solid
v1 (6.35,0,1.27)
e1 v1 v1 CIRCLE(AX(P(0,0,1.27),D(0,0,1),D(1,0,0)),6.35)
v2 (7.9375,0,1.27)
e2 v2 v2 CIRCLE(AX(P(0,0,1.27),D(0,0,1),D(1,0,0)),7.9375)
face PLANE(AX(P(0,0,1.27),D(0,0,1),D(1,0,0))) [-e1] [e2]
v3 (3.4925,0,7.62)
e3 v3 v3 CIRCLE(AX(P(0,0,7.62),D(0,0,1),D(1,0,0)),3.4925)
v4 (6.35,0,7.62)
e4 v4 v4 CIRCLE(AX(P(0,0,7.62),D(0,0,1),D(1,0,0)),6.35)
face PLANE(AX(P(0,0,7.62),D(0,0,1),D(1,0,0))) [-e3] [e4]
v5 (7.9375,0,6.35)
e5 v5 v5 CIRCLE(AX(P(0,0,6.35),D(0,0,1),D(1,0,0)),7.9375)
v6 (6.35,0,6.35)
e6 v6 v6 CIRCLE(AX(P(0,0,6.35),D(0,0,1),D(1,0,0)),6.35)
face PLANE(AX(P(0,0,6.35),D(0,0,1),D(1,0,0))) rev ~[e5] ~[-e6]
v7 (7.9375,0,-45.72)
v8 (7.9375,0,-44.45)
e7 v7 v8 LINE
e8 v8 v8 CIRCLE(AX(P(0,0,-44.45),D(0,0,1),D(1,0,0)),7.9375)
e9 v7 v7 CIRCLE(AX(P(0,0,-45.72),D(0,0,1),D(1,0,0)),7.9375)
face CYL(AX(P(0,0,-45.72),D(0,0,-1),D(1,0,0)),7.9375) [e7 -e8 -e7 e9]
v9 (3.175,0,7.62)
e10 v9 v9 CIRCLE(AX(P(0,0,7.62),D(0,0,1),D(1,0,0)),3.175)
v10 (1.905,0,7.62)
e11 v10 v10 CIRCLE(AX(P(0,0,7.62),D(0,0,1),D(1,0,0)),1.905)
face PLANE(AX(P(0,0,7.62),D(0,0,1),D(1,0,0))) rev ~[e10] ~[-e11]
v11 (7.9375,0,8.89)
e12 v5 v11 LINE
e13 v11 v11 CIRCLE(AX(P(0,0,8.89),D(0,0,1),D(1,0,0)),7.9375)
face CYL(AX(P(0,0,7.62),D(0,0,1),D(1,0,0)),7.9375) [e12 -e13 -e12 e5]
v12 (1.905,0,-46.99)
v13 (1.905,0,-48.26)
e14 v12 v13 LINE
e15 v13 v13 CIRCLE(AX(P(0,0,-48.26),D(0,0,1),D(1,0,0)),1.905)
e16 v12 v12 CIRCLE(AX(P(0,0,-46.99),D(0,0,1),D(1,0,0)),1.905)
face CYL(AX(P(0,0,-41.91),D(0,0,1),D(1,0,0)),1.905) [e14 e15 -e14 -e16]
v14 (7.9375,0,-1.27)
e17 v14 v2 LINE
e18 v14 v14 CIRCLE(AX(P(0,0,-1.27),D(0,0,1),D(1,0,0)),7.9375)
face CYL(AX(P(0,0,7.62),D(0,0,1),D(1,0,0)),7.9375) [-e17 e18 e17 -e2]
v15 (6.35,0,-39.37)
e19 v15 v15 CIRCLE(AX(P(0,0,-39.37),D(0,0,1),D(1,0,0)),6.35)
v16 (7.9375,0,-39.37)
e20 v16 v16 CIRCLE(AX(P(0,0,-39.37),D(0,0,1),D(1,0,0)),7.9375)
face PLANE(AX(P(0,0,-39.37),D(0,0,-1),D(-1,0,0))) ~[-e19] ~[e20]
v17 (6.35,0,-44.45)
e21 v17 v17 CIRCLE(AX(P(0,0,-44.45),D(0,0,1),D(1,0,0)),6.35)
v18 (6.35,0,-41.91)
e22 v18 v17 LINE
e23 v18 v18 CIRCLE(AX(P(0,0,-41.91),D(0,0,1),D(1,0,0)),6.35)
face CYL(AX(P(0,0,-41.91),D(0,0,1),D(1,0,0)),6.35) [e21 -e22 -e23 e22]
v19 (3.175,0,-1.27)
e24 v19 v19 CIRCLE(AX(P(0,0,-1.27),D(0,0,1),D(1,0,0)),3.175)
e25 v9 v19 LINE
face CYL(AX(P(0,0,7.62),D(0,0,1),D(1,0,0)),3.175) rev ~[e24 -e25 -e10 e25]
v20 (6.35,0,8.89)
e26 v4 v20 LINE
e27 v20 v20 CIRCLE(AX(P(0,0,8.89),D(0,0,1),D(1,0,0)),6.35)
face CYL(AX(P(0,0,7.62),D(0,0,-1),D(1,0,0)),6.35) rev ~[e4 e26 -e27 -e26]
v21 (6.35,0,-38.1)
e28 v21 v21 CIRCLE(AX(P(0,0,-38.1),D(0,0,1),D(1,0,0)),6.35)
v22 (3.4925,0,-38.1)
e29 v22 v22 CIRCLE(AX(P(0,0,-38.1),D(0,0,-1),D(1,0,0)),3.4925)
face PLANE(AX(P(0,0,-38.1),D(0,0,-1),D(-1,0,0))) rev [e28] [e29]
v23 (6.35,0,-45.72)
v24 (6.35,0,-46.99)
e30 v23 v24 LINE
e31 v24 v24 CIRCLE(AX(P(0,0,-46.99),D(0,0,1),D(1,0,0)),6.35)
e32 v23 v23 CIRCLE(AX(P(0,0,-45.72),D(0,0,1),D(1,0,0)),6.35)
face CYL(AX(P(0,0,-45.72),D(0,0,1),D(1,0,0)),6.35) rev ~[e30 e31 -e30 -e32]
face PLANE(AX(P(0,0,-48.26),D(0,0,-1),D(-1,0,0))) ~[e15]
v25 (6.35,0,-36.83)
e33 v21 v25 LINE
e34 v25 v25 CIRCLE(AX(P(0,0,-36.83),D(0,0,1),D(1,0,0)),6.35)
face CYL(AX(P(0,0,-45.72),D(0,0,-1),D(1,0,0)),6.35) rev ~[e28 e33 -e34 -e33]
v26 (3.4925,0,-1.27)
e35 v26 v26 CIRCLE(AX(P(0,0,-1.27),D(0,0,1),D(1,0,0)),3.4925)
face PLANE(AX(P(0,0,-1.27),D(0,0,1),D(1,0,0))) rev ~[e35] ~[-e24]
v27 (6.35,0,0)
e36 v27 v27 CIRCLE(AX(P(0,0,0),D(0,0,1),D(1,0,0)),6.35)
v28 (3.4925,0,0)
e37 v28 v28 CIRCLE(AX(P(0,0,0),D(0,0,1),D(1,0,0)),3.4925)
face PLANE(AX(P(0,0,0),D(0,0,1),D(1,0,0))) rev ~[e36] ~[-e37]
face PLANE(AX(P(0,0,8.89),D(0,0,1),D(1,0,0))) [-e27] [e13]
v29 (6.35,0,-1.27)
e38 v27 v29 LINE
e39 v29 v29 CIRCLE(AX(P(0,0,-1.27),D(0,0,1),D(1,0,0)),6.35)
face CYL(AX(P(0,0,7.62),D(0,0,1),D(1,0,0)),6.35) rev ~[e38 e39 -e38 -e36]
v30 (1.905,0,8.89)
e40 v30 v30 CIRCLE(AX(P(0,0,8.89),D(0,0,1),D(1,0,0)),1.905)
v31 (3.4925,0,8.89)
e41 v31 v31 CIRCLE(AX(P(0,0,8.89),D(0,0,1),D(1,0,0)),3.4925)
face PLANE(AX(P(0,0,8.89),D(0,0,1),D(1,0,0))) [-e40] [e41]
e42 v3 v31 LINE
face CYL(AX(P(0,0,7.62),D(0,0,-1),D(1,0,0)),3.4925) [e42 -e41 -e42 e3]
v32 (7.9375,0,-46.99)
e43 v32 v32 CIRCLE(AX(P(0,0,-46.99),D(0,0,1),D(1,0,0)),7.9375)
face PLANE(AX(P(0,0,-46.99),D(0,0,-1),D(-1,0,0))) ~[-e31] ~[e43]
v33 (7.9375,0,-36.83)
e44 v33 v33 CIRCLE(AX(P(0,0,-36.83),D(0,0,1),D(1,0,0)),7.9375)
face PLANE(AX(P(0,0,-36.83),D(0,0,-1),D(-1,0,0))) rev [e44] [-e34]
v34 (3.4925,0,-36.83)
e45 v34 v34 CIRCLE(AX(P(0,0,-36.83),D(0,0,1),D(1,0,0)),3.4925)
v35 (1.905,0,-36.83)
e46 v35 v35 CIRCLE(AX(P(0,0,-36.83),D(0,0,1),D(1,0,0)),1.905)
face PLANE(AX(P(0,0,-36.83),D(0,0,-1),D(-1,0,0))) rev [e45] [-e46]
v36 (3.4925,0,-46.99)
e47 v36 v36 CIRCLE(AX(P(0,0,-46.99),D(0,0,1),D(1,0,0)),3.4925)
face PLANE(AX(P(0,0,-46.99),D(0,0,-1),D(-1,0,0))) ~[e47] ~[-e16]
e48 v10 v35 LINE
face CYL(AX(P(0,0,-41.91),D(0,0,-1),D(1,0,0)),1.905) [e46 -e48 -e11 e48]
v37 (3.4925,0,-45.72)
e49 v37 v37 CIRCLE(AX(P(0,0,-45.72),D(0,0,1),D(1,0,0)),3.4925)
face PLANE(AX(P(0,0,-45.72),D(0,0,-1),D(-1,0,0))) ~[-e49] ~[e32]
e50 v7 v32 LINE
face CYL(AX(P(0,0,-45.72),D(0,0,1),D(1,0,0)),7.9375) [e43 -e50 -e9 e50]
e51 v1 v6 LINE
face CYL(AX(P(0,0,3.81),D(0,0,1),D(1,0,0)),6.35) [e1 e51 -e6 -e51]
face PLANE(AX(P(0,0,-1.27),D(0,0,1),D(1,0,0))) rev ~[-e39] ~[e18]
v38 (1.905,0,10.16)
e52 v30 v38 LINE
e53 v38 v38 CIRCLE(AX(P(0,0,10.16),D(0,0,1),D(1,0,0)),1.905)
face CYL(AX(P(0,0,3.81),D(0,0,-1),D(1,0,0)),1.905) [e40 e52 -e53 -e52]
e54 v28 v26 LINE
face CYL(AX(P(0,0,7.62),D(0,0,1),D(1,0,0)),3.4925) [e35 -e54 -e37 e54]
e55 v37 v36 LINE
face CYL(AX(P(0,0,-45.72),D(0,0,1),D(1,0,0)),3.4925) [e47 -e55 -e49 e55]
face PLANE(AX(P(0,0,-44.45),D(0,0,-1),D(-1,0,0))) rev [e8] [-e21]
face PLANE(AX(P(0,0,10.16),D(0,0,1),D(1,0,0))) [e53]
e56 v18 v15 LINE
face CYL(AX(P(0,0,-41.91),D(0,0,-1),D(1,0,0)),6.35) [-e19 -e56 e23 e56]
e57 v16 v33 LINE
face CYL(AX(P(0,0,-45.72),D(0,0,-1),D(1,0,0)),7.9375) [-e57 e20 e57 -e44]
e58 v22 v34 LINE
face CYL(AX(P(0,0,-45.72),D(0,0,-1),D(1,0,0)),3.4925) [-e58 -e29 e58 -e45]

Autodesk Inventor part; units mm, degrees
ref_plane "YZ Plane" through (0, 0, 0) normal (1, 0, 0) x (0, 1, 0)
sketch "Sketch3" plane through (0, 0, 0) normal (0, 0, 1) x (1, 0, 0)
  circle A0 centre (0, 0) radius 6.35
  dimension "d11" = 12.7
extrude "Extrusion3" add sketch "Sketch3" along normal blind 7.62
sketch "Sketch4" plane through (0, 0, 7.62) normal (0, 0, 1) x (1, 0, 0)
  circle A0 centre (0, 0) radius 7.9375
  circle A1 centre (0, 0) radius 6.35
  dimension "d14" = 15.875
  dimension "d15" = 12.7
extrude "Extrusion4" add sketch "Sketch4" along normal blind 1.27 and the other way blind 8.89
ref_plane "Work Plane1" through (0, 0, 3.81) normal (0, 0, 1) x (1, 0, 0)
sketch "Sketch5" plane through (0, 0, 3.81) normal (0, 0, 1) x (1, 0, 0)
  circle A0 centre (0, 0) radius 6.35 projected
  circle A1 centre (0, 0) radius 8.89
  circle A2 centre (0, 0) radius 7.9375 projected
  circle A3 centre (0, 0) radius 8.9298
extrude "Extrusion5" cut sketch "Sketch5" along normal mid plane 5.08 contours A2
sketch "Sketch6" plane through (0, 0, 7.62) normal (0, 0, 1) x (1, 0, 0)
  circle A0 centre (0, 0) radius 1.905
  circle A1 centre (0, 0) radius 3.4925
  dimension "d23" = 3.81
  dimension "d24" = 6.985
extrude "Extrusion6" add sketch "Sketch6" along normal blind 1.27 and the other way blind 8.89
sketch "Sketch7" plane through (0, 0, 7.62) normal (0, 0, 1) x (1, 0, 0)
  circle A0 centre (0, 0) radius 3.175
extrude "Extrusion7" cut sketch "Sketch7" against normal blind 9.2075
sketch "Sketch8" plane through (0, 0, 3.81) normal (0, 0, 1) x (1, 0, 0)
  circle A0 centre (0, 0) radius 1.905
  dimension "d36" = 3.81
extrude "Extrusion8" add sketch "Sketch8" along normal blind 6.35 and the other way blind 22.86
ref_plane "Work Plane2" through (0, 0, -19.05) normal (0, 0, -1) x (-1, 0, 0)
mirror "Mirror1" about plane through (0, 0, -19.05) normal (0, 0, -1) of "Extrusion5", "Extrusion4", "Extrusion3", "Extrusion8", "Extrusion6"
properties part number "Small Wheels for Polar Express [Copy]"
